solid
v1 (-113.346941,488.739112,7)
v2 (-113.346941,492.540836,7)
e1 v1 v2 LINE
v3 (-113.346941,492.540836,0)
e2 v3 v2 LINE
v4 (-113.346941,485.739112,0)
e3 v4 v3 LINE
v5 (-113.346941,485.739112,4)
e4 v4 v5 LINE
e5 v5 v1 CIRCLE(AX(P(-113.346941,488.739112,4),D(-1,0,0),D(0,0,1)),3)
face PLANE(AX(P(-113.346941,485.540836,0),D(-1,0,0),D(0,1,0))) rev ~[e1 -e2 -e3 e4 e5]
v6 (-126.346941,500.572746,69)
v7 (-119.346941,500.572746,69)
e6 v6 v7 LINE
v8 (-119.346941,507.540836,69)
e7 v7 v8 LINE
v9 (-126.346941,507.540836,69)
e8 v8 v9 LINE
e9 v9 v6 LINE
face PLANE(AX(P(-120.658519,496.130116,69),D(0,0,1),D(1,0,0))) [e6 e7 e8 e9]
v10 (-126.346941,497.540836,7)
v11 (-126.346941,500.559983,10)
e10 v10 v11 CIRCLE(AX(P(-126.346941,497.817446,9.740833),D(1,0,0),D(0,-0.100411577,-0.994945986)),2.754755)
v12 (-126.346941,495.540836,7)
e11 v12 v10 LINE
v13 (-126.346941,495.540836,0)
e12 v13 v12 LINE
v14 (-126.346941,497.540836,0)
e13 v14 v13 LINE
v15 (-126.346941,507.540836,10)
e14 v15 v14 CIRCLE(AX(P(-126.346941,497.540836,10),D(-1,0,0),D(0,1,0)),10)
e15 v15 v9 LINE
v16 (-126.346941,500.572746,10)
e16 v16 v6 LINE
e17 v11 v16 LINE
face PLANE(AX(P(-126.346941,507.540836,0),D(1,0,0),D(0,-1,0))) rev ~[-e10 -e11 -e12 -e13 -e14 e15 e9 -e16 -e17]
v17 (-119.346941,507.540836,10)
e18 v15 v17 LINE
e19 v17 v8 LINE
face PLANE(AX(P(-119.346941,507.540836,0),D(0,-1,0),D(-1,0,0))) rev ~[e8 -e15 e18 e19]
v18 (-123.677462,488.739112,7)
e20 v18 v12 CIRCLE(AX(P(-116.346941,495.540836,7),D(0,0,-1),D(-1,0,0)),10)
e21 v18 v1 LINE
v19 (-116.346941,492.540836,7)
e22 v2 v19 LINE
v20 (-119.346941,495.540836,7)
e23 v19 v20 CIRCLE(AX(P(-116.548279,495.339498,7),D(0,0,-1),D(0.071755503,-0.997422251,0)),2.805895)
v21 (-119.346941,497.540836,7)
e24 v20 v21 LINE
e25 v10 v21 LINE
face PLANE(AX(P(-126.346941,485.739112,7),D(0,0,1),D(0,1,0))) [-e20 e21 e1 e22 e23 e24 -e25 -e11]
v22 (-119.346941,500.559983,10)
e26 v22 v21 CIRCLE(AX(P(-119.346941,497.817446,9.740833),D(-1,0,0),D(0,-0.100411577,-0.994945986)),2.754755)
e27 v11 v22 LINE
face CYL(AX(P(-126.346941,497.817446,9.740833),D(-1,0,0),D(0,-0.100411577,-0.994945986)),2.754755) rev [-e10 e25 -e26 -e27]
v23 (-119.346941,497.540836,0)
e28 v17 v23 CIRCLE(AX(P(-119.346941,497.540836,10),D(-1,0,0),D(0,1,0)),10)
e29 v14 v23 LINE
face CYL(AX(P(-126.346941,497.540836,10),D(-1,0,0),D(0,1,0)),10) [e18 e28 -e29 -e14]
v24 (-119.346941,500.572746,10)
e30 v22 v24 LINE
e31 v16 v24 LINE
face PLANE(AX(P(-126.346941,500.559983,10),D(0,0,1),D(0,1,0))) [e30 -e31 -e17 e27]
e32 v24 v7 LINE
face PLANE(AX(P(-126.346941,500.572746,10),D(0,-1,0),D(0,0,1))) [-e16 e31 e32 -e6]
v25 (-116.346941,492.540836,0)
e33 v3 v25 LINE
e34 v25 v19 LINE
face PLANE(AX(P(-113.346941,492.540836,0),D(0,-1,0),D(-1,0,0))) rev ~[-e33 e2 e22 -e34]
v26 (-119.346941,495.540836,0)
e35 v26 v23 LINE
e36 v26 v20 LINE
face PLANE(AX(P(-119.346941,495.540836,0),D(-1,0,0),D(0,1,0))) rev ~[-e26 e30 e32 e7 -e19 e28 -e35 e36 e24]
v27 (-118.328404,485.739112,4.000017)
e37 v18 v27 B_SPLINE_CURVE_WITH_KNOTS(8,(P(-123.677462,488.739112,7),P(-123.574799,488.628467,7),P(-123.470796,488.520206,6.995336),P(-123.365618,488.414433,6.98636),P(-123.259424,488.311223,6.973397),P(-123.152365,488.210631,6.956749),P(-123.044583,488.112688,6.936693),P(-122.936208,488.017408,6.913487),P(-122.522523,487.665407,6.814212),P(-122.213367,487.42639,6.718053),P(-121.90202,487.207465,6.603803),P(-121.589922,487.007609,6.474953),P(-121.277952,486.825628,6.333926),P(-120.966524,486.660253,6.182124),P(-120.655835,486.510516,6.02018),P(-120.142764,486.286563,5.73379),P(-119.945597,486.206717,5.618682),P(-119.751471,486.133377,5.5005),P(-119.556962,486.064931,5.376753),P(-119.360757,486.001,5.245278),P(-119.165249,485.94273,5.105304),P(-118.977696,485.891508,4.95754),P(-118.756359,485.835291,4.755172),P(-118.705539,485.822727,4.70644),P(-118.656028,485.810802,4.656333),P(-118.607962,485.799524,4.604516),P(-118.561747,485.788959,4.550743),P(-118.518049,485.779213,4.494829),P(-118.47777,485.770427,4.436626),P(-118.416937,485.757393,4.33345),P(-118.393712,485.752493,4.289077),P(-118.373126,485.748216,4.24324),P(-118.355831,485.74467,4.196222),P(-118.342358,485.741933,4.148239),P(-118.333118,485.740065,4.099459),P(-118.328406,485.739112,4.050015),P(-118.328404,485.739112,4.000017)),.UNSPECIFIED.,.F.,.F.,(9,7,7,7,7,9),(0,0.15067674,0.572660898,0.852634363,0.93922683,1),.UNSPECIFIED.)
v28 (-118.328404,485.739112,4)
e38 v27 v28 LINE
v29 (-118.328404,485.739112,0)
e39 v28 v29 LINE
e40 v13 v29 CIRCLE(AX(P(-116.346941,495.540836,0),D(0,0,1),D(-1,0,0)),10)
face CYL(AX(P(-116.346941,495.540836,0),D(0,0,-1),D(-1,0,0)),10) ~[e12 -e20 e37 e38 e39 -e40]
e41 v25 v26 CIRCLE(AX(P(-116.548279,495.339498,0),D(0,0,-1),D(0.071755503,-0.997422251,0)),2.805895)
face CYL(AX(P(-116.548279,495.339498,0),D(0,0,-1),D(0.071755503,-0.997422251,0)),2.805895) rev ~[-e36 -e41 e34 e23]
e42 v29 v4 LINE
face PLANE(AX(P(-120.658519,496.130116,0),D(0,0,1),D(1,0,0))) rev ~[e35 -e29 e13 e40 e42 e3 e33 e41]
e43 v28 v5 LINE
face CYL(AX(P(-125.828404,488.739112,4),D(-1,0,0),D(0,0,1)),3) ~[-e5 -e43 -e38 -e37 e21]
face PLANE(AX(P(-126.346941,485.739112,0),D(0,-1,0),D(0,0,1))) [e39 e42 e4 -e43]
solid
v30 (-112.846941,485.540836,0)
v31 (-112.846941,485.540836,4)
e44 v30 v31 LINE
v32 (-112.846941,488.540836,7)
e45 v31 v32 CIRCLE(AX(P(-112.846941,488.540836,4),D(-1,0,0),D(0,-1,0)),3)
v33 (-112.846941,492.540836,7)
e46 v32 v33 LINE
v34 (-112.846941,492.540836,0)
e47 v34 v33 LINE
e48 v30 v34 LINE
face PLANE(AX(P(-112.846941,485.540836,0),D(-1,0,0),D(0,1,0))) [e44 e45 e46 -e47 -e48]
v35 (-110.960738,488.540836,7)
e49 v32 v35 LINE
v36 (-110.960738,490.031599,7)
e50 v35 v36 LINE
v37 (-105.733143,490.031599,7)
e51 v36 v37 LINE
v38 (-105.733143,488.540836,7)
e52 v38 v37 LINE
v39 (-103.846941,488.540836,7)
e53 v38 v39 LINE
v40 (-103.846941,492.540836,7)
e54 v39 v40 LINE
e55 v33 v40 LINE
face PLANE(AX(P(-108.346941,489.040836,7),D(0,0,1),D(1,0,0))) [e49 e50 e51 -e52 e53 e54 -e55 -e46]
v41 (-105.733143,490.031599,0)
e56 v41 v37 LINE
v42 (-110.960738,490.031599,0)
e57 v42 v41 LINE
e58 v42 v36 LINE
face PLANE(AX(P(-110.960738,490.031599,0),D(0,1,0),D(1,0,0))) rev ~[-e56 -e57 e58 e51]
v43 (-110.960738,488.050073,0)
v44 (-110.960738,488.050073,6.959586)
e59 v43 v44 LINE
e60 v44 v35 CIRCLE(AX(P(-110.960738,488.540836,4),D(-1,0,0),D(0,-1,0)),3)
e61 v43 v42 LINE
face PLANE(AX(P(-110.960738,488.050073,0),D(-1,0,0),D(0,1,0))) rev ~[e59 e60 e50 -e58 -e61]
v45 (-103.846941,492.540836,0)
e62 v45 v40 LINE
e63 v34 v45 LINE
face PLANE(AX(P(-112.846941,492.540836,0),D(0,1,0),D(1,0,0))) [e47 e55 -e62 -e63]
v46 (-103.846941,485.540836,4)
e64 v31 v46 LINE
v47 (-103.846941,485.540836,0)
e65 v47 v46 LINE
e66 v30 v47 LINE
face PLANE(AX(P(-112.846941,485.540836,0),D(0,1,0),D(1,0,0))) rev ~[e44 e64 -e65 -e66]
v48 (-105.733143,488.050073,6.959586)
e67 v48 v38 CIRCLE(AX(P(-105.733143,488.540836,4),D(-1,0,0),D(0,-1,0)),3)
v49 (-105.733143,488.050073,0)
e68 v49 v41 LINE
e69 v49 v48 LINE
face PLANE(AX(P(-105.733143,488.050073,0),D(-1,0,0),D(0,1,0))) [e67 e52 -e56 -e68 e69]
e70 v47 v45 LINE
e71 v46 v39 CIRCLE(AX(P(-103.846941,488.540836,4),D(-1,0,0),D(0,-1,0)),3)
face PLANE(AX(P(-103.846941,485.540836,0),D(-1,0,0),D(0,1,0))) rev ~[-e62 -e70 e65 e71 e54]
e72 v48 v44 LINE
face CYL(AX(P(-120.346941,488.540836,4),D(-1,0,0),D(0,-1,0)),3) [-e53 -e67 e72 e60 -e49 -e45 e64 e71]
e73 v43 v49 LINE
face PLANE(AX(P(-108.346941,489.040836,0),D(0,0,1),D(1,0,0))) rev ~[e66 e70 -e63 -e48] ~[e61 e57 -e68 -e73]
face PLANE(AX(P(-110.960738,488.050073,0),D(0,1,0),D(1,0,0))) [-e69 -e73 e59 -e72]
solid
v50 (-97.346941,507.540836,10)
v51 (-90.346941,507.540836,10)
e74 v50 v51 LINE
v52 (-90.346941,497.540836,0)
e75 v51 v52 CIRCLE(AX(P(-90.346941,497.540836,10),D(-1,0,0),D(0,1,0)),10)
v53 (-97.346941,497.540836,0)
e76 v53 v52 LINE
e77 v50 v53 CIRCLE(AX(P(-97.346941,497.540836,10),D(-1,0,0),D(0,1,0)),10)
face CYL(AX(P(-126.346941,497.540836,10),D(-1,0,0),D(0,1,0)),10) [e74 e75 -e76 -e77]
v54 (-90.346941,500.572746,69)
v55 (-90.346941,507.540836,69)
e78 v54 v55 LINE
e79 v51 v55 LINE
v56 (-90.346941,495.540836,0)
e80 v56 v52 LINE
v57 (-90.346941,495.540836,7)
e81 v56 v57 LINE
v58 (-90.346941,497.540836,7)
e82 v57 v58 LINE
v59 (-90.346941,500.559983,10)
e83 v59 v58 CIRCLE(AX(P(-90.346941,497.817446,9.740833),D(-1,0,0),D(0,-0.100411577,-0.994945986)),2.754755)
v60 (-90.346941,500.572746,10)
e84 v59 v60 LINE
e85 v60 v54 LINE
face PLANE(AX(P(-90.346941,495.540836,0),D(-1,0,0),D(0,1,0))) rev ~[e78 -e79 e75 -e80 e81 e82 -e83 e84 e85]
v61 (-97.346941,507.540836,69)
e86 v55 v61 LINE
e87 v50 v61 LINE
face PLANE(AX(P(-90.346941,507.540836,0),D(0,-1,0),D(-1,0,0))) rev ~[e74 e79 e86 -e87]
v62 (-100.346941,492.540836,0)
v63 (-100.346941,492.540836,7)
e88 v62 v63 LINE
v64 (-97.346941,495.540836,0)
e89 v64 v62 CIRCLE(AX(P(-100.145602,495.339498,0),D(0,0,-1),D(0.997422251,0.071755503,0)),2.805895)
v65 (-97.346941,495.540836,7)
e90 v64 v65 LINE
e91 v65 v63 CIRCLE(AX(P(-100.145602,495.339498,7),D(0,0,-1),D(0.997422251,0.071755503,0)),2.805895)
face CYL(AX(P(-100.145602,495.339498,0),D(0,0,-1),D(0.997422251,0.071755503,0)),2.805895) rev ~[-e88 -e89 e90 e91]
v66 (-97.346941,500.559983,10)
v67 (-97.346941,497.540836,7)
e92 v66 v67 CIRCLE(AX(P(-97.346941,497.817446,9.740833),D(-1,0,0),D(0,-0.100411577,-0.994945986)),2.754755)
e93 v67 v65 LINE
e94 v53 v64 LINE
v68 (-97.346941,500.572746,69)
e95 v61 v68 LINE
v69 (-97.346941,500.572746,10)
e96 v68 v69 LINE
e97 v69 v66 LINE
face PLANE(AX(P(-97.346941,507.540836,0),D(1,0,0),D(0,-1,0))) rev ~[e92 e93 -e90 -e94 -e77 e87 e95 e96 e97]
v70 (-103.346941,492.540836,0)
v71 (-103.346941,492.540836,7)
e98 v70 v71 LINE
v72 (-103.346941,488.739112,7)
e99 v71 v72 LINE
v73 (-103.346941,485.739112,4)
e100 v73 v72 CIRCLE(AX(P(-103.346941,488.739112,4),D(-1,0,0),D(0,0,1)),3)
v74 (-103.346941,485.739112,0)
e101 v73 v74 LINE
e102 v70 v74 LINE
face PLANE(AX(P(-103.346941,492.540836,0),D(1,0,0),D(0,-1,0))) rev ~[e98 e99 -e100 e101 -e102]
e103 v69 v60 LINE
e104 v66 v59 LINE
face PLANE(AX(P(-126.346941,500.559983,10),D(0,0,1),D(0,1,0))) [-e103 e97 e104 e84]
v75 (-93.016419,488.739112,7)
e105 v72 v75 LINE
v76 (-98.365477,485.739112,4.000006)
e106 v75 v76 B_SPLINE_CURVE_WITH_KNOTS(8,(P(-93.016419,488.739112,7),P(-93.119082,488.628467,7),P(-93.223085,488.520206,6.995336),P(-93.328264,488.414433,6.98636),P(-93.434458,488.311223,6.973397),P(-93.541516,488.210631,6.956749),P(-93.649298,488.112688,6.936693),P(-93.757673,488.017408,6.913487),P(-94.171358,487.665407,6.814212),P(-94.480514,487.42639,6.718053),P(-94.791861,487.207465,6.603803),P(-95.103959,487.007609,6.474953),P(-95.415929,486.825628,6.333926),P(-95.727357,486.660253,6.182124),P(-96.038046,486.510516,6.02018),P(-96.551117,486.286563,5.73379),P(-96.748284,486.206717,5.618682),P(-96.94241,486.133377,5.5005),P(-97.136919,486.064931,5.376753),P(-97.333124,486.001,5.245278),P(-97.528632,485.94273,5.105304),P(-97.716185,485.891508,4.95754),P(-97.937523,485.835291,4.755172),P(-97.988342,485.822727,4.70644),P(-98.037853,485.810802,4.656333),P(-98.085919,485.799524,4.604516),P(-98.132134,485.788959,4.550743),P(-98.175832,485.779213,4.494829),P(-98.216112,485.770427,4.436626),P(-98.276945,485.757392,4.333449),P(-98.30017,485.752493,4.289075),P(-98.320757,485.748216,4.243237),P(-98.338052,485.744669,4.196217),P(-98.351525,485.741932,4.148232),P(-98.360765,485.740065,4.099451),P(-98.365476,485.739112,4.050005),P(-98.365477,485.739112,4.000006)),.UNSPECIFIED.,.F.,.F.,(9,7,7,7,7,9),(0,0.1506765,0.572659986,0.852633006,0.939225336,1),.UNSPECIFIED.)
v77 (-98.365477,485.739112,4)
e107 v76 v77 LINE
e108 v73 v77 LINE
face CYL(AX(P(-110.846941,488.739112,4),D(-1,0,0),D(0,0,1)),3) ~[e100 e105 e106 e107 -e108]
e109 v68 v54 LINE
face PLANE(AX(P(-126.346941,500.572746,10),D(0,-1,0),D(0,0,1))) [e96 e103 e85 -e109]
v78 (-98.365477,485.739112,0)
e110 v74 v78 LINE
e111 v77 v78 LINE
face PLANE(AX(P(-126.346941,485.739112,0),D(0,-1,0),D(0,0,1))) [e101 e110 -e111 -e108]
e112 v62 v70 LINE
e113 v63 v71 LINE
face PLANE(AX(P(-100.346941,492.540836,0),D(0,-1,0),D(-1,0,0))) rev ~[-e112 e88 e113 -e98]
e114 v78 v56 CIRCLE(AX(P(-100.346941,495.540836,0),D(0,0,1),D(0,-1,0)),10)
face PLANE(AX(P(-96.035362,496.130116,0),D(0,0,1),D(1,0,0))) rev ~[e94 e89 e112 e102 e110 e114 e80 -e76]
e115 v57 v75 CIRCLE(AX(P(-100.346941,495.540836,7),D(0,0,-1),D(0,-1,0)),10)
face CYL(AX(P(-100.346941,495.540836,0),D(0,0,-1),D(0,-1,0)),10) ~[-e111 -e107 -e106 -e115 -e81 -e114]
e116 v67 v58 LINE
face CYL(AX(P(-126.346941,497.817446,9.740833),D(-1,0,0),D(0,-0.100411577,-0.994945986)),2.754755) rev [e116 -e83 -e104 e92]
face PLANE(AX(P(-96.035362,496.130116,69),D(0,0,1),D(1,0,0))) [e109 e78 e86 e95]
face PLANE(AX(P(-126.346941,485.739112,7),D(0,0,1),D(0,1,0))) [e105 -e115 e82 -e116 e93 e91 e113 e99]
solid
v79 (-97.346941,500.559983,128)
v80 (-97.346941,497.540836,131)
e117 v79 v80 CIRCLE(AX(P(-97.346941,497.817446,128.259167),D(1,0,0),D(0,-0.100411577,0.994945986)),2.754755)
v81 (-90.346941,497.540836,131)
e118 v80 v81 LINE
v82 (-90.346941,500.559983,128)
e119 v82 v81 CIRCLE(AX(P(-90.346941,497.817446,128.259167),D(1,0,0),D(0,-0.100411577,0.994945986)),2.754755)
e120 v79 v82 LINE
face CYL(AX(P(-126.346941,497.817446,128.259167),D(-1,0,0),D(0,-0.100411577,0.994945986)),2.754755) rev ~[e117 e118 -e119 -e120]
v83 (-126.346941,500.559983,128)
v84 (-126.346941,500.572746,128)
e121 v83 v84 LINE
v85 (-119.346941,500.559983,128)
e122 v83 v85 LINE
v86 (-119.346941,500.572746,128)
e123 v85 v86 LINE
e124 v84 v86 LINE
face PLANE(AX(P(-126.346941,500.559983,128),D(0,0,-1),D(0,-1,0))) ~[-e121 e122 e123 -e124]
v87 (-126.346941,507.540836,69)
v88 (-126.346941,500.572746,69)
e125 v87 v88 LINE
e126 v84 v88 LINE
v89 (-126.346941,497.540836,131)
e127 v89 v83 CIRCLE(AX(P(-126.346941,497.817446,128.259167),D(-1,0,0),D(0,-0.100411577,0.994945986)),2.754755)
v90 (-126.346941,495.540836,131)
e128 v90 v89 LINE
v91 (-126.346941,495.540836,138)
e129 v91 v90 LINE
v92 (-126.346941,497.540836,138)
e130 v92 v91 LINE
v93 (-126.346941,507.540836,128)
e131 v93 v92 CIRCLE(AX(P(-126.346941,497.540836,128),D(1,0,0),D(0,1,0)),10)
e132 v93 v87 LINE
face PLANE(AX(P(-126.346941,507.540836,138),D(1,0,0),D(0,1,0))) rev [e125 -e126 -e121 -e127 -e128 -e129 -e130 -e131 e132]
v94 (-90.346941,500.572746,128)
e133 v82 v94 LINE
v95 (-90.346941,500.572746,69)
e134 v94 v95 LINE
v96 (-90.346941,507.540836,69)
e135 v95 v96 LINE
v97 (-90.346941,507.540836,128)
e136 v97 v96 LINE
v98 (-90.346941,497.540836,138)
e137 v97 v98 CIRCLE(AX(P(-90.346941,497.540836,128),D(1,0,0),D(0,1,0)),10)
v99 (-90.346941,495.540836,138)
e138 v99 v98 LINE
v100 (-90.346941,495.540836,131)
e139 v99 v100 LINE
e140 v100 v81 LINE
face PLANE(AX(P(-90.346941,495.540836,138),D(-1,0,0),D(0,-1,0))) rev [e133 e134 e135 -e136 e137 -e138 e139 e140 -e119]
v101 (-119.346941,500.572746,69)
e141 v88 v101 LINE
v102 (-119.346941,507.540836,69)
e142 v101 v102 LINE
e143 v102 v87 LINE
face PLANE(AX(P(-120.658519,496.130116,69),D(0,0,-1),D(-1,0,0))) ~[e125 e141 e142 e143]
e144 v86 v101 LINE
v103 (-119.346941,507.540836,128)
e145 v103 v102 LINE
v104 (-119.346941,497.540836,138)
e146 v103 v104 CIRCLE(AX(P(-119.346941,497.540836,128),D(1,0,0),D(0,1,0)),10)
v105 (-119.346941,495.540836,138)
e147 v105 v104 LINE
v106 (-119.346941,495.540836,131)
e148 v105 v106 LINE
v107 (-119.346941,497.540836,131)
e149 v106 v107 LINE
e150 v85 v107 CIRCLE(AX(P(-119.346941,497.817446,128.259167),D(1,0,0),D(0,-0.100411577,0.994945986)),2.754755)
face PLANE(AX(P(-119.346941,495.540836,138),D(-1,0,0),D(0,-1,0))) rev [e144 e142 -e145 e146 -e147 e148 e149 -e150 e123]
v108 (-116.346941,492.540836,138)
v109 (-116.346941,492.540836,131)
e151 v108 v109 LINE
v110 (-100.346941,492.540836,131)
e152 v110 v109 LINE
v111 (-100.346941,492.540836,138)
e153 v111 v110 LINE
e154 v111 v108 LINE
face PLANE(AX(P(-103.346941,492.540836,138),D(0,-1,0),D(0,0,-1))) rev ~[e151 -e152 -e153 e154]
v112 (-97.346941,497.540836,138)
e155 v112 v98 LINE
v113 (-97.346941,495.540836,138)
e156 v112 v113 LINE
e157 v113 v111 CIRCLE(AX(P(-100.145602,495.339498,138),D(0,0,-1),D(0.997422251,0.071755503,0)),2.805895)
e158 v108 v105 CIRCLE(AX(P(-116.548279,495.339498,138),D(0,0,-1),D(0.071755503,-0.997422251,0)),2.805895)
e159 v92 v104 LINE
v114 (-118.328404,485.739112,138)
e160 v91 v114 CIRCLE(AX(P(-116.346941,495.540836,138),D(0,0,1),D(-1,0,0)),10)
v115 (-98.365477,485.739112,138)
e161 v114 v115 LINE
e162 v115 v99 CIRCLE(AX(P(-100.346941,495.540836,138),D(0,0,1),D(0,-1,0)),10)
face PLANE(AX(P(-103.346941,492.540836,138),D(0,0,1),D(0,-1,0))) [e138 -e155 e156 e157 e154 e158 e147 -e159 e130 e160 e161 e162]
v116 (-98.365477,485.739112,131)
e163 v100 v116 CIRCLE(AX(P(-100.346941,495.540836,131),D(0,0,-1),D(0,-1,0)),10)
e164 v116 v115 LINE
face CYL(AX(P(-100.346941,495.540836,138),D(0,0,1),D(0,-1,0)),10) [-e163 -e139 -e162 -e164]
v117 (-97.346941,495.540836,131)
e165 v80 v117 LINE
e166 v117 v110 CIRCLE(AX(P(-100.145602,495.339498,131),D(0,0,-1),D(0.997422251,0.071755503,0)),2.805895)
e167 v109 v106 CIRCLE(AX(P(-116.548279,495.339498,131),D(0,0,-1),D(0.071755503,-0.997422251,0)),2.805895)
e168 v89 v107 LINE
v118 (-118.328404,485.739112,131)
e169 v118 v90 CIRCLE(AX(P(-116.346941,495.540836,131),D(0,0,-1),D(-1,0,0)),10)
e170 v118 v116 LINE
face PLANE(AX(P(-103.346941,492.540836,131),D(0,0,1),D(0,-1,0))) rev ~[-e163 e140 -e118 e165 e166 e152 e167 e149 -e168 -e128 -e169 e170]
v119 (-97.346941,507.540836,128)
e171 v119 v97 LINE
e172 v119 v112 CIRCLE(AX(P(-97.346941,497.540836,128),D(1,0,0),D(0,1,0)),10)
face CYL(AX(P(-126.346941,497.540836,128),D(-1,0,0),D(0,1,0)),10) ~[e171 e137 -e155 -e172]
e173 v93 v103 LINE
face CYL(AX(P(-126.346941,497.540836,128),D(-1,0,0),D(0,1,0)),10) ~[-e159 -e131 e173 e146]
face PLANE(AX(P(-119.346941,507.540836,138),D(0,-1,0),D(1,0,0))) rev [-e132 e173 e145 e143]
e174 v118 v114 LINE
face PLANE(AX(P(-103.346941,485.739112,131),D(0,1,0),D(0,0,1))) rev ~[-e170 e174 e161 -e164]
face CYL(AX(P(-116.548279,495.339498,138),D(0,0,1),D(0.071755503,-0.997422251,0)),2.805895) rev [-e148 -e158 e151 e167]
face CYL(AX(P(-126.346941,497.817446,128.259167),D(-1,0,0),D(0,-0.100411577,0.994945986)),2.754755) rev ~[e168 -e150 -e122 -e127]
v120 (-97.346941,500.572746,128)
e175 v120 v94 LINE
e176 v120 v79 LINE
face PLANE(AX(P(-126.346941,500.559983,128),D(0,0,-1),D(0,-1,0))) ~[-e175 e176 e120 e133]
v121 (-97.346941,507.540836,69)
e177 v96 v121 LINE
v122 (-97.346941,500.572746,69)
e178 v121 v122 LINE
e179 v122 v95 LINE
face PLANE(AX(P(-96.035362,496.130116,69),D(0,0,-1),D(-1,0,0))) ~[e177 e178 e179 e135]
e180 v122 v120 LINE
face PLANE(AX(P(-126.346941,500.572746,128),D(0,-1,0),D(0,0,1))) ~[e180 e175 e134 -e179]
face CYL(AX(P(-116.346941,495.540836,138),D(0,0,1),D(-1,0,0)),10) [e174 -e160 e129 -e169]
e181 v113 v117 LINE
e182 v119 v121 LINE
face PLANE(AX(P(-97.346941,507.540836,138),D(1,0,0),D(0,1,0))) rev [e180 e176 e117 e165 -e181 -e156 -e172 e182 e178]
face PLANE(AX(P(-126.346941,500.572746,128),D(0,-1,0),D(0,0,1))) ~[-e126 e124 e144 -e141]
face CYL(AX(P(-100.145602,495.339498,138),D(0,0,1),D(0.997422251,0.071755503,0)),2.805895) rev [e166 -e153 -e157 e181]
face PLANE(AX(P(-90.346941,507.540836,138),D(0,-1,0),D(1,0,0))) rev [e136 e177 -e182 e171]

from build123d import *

# Parameters (mm, degrees)
F3_DEPTH      = 69
F4_W          = 9.8017244339
F4_H          = 7
F5_DEPTH      = 81.7
F7_W          = 9
F7_H          = 7
F7_W_2        = 5.2275949775
F7_H_2        = 1.981525898
F8_DEPTH      = 7
F9_T1_DEPTH   = 19.9814636312
F9_2_T1_DEPTH = 19.9814636312
F9_3_T1_DEPTH = 24
F10_DEPTH     = 11.5


# Not quite as in the source:
# - a fillet or chamfer that OpenCascade refuses, or shapes differently, is made with other operations: its cross-section is extruded or revolved along the edge and cut away or added


with BuildPart() as f3:
    # F2 (on Top) → F3 (new body)
    with BuildSketch(Plane.XY):
        with BuildLine():
            Line((-126.34694054, 507.5408363342), (-126.34694054, 500.5408363342))
            Line((-126.34694054, 500.5408363342), (-126.34694054, 495.5408363342))
            ThreePointArc((-126.34694054, 495.5408363342), (-123.4180083519, 488.4697685224), (-116.34694054, 485.5408363342))
            Line((-116.34694054, 485.5408363342), (-113.34694054, 485.5408363342))
            Line((-113.34694054, 485.5408363342), (-113.34694054, 492.5408363342))
            Line((-113.34694054, 492.5408363342), (-116.34694054, 492.5408363342))
            ThreePointArc((-116.34694054, 492.5408363342), (-118.5323459538, 493.3554309204), (-119.34694054, 495.5408363342))
            Line((-119.34694054, 495.5408363342), (-119.34694054, 500.5408363342))
            Line((-119.34694054, 500.5408363342), (-119.34694054, 507.5408363342))
            Line((-119.34694054, 507.5408363342), (-126.34694054, 507.5408363342))
        make_face()
    extrude(amount=F3_DEPTH)


with BuildPart() as f3b:
    # F2 (on Top) → F3, piece 2 (new body)
    with BuildSketch(Plane.XY):
        with BuildLine():
            Line((-103.34694054, 492.5408363342), (-103.34694054, 485.5408363342))
            Line((-103.34694054, 485.5408363342), (-100.34694054, 485.5408363342))
            ThreePointArc((-100.34694054, 485.5408363342), (-93.2758727282, 488.4697685224), (-90.34694054, 495.5408363342))
            Line((-90.34694054, 495.5408363342), (-90.34694054, 500.5408363342))
            Line((-90.34694054, 500.5408363342), (-90.34694054, 507.5408363342))
            Line((-90.34694054, 507.5408363342), (-97.34694054, 507.5408363342))
            Line((-97.34694054, 507.5408363342), (-97.34694054, 500.5408363342))
            Line((-97.34694054, 500.5408363342), (-97.34694054, 495.5408363342))
            ThreePointArc((-97.34694054, 495.5408363342), (-98.1615351262, 493.3554309204), (-100.34694054, 492.5408363342))
            Line((-100.34694054, 492.5408363342), (-103.34694054, 492.5408363342))
        make_face()
    extrude(amount=F3_DEPTH)


with BuildPart() as f5_tool:
    # F4 (on face) → F5 (new body)
    with BuildSketch(Plane(origin=(-126.34694054, 0, 0), x_dir=(0, -1, 0), z_dir=(-1, 0, 0))):
        Polygon((-500.5727462455, 69), (-507.5408363342, 69), (-507.5408363342, 16.4578538388), (-507.5408363342, 10), (-500.5727462455, 10), align=None)
        with Locations((-490.6399741173, 3.5)):
            Rectangle(F4_W, F4_H)
        with BuildLine():
            Line((-500.5599826709, 10), (-500.5727462455, 10))
            Line((-500.5727462455, 10), (-507.5408363342, 10))
            ThreePointArc((-507.5408363342, 10), (-504.6119041461, 2.9289321881), (-497.5408363342, 0))
            Line((-497.5408363342, 0), (-495.5408363342, 0))
            Line((-495.5408363342, 0), (-495.5408363342, 7))
            Line((-495.5408363342, 7), (-497.5408363342, 7))
            ThreePointArc((-497.5408363342, 7), (-499.7591459044, 7.7867403629), (-500.5599826709, 10))
        make_face()
    extrude(amount=-F5_DEPTH)


with BuildPart() as f3_1:
    add(f3.part)

    # F5: intersect by f5_tool
    add(f5_tool.part, mode=Mode.INTERSECT)


with BuildPart() as f3b_1:
    add(f3b.part)

    # F5: intersect by f5_tool
    add(f5_tool.part, mode=Mode.INTERSECT)


with BuildPart() as f6_1:
    # F6: instance of F3
    add(f3_1.part.mirror(Plane(origin=(-93.84694054, 504.0567912899, 69), x_dir=(1, 0, 0), z_dir=(0, 0, 1))))



with BuildPart() as f6_2:
    # F6: instance of F3b
    add(f3b_1.part.mirror(Plane(origin=(-93.84694054, 504.0567912899, 69), x_dir=(1, 0, 0), z_dir=(0, 0, 1))))


with BuildPart() as f8:
    # F7 (on Top) → F8 (new body)
    with BuildSketch(Plane.XY):
        with Locations((-108.34694054, 489.0408363342)):
            Rectangle(F7_W, F7_H)
        with Locations((-108.34694054, 489.0408363342)):
            Rectangle(F7_W_2, F7_H_2, mode=Mode.SUBTRACT)
    extrude(amount=F8_DEPTH)

    # F9#3: fillet of radius 3 on 1 edges, made by hand

    # F9_3_s2 → F9_3_t1 (cut)
    with BuildSketch(Plane.YZ.offset(-120.34694054)):
        with BuildLine():
            ThreePointArc((485.5408363342, 4), (486.4195159907, 6.1213203436), (488.5408363342, 7))
            Line((488.5408363342, 7), (485.5408363342, 7))
            Line((485.5408363342, 7), (485.5408363342, 4))
        make_face()
    extrude(amount=F9_3_T1_DEPTH, mode=Mode.SUBTRACT)


with BuildPart() as f3_2:
    add(f3_1.part)

    # F9: fillet of radius 3 on 1 edges, made by hand

    # F9_s2 → F9_t1 (cut)
    with BuildSketch(Plane.YZ.offset(-125.8284041713)):
        with BuildLine():
            ThreePointArc((488.7391119003, 7), (486.6177915568, 6.1213203436), (485.7391119003, 4))
            Line((485.7391119003, 4), (485.7391119003, 7))
            Line((485.7391119003, 7), (488.7391119003, 7))
        make_face()
    extrude(amount=F9_T1_DEPTH, mode=Mode.SUBTRACT)


with BuildPart() as f3b_2:
    add(f3b_1.part)

    # F9#2: fillet of radius 3 on 1 edges, made by hand

    # F9_2_s2 → F9_2_t1 (cut)
    with BuildSketch(Plane.YZ.offset(-110.84694054)):
        with BuildLine():
            ThreePointArc((488.7391119003, 7), (486.6177915568, 6.1213203436), (485.7391119003, 4))
            Line((485.7391119003, 4), (485.7391119003, 7))
            Line((485.7391119003, 7), (488.7391119003, 7))
        make_face()
    extrude(amount=F9_2_T1_DEPTH, mode=Mode.SUBTRACT)


with BuildPart() as f6_1_1:
    add(f6_1.part)
    # F10 (add): a face of the model
    f10_faces = [f6_2.part.faces().sort_by_distance(p)[0] for p in [
        (-103.34694054, 489.1399741173, 134.5),
    ]]

    add(f6_2.part)  # F10 merges F6_2
    extrude(f10_faces, amount=F10_DEPTH)


solid = Compound([f8.part, f3_2.part, f3b_2.part, f6_1_1.part])
